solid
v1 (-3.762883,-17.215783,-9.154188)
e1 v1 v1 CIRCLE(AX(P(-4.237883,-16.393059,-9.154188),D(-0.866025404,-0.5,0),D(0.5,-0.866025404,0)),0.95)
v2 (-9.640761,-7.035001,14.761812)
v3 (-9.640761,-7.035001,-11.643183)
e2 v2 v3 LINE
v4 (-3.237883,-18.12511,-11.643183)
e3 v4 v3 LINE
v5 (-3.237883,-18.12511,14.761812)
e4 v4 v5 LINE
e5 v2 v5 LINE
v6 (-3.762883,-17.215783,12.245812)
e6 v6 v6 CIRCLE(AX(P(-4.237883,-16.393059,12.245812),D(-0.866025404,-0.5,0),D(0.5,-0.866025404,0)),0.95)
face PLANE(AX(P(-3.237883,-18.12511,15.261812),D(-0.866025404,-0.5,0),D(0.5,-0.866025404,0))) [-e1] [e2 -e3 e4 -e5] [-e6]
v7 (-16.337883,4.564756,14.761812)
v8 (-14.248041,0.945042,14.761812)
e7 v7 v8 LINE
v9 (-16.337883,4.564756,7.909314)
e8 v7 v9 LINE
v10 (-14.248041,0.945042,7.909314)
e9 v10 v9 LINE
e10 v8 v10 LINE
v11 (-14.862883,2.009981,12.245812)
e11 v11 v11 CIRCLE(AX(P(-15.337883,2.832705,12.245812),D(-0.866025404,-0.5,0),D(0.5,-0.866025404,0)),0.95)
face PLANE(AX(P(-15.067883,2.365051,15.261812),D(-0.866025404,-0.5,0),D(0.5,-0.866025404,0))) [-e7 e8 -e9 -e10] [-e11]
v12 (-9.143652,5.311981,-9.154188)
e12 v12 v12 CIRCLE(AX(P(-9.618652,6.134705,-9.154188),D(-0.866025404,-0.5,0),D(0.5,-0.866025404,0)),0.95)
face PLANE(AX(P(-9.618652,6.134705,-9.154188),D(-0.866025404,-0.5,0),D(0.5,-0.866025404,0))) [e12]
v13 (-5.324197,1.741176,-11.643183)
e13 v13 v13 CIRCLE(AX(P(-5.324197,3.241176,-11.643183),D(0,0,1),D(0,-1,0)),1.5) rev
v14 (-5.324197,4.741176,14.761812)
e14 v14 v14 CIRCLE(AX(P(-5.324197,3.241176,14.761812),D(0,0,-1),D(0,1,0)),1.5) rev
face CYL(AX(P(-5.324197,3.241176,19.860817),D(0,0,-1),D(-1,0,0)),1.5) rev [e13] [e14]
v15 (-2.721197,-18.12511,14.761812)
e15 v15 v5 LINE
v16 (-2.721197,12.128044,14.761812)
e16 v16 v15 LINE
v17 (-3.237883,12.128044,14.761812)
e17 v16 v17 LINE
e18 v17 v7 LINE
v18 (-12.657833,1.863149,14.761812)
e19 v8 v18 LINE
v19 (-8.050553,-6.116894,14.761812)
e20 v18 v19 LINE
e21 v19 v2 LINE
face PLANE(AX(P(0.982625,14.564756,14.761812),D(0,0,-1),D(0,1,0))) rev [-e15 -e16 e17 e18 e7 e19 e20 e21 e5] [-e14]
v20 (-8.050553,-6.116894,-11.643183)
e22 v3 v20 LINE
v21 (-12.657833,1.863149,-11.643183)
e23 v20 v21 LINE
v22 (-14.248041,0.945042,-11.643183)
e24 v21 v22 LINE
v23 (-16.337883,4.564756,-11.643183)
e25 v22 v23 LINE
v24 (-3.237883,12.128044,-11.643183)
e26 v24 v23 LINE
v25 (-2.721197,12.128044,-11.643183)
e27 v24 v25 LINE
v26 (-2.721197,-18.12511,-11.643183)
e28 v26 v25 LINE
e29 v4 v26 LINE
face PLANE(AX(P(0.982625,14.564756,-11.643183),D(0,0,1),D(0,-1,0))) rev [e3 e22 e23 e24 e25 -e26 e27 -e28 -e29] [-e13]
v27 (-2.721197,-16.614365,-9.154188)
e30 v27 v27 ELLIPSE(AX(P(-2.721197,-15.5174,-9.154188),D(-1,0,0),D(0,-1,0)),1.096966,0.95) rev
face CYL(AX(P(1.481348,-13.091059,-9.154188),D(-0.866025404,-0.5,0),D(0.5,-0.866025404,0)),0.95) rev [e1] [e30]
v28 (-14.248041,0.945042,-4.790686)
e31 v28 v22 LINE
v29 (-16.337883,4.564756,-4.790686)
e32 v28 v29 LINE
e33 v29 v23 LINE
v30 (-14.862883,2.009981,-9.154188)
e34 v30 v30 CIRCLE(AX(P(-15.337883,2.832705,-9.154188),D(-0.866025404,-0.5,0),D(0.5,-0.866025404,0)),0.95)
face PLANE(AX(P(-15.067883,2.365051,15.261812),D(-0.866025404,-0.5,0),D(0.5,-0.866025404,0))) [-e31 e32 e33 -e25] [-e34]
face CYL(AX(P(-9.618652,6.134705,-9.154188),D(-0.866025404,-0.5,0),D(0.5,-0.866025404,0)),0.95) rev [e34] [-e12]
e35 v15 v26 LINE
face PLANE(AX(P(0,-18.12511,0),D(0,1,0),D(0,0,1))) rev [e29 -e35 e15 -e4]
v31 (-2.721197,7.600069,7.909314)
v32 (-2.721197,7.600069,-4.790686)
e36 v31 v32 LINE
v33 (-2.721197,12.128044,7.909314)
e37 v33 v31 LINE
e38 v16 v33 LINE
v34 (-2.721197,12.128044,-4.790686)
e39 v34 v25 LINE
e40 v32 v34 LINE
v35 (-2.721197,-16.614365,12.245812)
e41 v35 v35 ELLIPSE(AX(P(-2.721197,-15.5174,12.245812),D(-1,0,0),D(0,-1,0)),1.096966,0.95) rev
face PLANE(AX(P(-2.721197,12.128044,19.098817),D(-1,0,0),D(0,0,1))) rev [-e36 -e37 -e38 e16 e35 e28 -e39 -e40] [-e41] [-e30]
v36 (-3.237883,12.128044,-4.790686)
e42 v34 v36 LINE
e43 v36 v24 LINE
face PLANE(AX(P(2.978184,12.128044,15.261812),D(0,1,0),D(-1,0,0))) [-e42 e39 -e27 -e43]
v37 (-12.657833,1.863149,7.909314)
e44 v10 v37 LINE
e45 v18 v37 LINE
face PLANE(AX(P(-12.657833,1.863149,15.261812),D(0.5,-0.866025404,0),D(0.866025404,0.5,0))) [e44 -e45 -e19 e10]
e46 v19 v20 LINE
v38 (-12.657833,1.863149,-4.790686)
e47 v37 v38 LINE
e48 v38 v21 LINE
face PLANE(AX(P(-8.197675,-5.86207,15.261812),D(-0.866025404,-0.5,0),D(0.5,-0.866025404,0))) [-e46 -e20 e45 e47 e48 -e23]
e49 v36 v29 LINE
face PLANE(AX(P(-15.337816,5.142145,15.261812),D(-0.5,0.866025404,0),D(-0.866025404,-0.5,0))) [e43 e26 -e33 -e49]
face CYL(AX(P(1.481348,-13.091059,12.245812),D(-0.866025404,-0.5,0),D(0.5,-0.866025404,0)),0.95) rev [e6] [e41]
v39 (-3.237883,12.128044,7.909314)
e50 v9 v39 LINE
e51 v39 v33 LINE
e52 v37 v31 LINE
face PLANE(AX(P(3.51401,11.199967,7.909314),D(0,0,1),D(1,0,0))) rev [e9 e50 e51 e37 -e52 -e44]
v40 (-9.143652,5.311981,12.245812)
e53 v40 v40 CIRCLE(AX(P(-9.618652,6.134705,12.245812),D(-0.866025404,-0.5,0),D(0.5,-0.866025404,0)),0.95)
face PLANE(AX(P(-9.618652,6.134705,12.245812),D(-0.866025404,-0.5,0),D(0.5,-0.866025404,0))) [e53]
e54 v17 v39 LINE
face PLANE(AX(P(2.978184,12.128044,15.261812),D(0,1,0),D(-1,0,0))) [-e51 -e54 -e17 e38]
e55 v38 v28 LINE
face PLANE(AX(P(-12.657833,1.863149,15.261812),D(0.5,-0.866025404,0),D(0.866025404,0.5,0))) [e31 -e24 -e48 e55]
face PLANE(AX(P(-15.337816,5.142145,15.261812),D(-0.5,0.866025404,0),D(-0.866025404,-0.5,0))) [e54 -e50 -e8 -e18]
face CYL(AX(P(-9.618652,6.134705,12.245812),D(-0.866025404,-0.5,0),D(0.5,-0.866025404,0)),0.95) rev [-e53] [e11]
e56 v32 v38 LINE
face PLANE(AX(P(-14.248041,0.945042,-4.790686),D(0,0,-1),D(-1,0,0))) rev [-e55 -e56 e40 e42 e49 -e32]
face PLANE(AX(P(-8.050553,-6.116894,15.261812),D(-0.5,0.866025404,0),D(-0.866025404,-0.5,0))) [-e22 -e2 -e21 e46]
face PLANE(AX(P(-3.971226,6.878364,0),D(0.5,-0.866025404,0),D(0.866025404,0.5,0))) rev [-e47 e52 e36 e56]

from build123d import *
from OCP.BRepAlgoAPI import BRepAlgoAPI_Cut
from OCP.TopTools import TopTools_ListOfShape

# Parameters (mm, degrees)
BOSS_EXTRUDE1_DEPTH      = 11.938
BOSS_EXTRUDE1_DEPTH_BACK = 18.12511
SKETCH1_W                = 6.216067572
SKETCH1_H                = 27.404994669
BOSS_EXTRUDE2_DEPTH      = 27.404995
CUT_EXTRUDE1_DEPTH       = 4.179688
SKETCH4_R                = 0.95
CUT_EXTRUDE2_DEPTH       = 6.604
SKETCH7_W                = 5.699381266
SKETCH7_H                = 30.253154106
CUT_EXTRUDE3_DEPTH       = 31.242
SKETCH8_R                = 1.5
CUT_EXTRUDE4_DEPTH       = 32.004
SKETCH9_W                = 0.5
SKETCH9_H                = 26.458343153
CUT_EXTRUDE5_DEPTH       = 20


with BuildPart() as part:
    # Sketch1 → Boss-Extrude1 (new, two sides: drawn at the far end of the back side and taken through both)
    with BuildSketch(Plane(origin=(0, 0, 0), x_dir=(1, 0, 0), z_dir=(0, 1, 0)).offset(-BOSS_EXTRUDE1_DEPTH_BACK)):
        with Locations((-0.12984965, -1.559314439)):
            Rectangle(SKETCH1_W, SKETCH1_H)
    extrude(amount=BOSS_EXTRUDE1_DEPTH + BOSS_EXTRUDE1_DEPTH_BACK)

    # Sketch2 → Boss-Extrude2 (add)
    with BuildSketch(Plane(origin=(0, 0, -12.143182896), x_dir=(-1, 0, 0), z_dir=(0, 0, -1))):
        Polygon((15.337816326, 5.142144986), (3.237883436, 12.128044498), (-2.978184136, 12.128044498), (-2.978184136, 11.938), (3.237883436, 11.938), (3.237883436, -18.125109608), (9.640760589, -7.035001064), (8.050552579, -6.116894042), (8.197675426, -5.862069796), (12.657832776, 1.863149344), (14.248040785, 0.945042321), (15.067883436, 2.365051446), (16.337883436, 4.564755971), align=None)
    extrude(amount=-BOSS_EXTRUDE2_DEPTH)

    # Sketch3 → Cut-Extrude1 (cut)
    with BuildSketch(Plane(origin=(-6.061068176, 10.498078028, 0), x_dir=(0.866025403784441, 0.49999999999999606, 0), z_dir=(-0.49999999999999606, 0.866025403784441, 0))):
        Polygon((-11.866644114, -1.559314438), (-11.866644114, -7.909314438), (3.259932939, -7.909314438), (8.643205368, -7.909314438), (8.643205368, 4.790685562), (3.259932939, 4.790685562), (-11.866644114, 4.790685562), align=None)
    extrude(amount=-CUT_EXTRUDE1_DEPTH, mode=Mode.SUBTRACT)

    # Sketch4 → Cut-Extrude2 (cut)
    with BuildSketch(Plane(origin=(-10.27681526, -5.933322057, 0), x_dir=(0, 0, 1), z_dir=(-0.8660254037844423, -0.49999999999999406, 0))):
        with Locations(Location((12.245811773, 10.122136351, 0), (0, 0, 270))):
            Circle(SKETCH4_R)
        with Locations(Location((-9.154188227, 10.122136351, 0), (0, 0, 270))):
            Circle(SKETCH4_R)
        with Locations(Location((-9.154188227, -12.077863649, 0), (0, 0, 270))):
            Circle(SKETCH4_R)
        with Locations(Location((12.245811773, -12.077863649, 0), (0, 0, 270))):
            Circle(SKETCH4_R)
    extrude(amount=-CUT_EXTRUDE2_DEPTH, mode=Mode.SUBTRACT)


with BuildPart() as cut_extrude3_tool:
    # Sketch7 → Cut-Extrude3 (new body)
    with BuildSketch(Plane(origin=(0, 0, -12.143182896), x_dir=(-1, 0, 0), z_dir=(0, 0, -1))):
        with Locations((-0.128493503, -2.998532555)):
            Rectangle(SKETCH7_W, SKETCH7_H)
    extrude(amount=-CUT_EXTRUDE3_DEPTH)


with BuildPart() as part_1:
    add(part.part)

    # Cut-Extrude3: cut by cut_extrude3_tool, with a tolerance
    cut_extrude3_stock = TopTools_ListOfShape()
    cut_extrude3_stock.Append(part_1.part.wrapped)
    cut_extrude3_tools = TopTools_ListOfShape()
    cut_extrude3_tools.Append(cut_extrude3_tool.part.wrapped)
    cut_extrude3_cut = BRepAlgoAPI_Cut()
    cut_extrude3_cut.SetArguments(cut_extrude3_stock)
    cut_extrude3_cut.SetTools(cut_extrude3_tools)
    cut_extrude3_cut.SetFuzzyValue(0.00001)
    cut_extrude3_cut.Build()
    add(Compound.cast(cut_extrude3_cut.Shape()).solids(), mode=Mode.REPLACE)

    # Sketch8 → Cut-Extrude4 (cut)
    with BuildSketch(Plane(origin=(0, 0, -12.143182896), x_dir=(-1, 0, 0), z_dir=(0, 0, -1))):
        with Locations((5.32419713, 3.241176343)):
            Circle(SKETCH8_R)
    extrude(amount=-CUT_EXTRUDE4_DEPTH, mode=Mode.SUBTRACT)

    # Sketch9 → Cut-Extrude5 (cut)
    with BuildSketch(Plane(origin=(-10.27681526, -5.933322057, 0), x_dir=(0, 0, 1), z_dir=(-0.8660254037844423, -0.49999999999999406, 0))):
        with Locations((-11.893182896, -1.107035226)):
            Rectangle(SKETCH9_W, SKETCH9_H)
        with Locations((15.011811773, -1.107035226)):
            Rectangle(SKETCH9_W, SKETCH9_H)
    extrude(amount=-CUT_EXTRUDE5_DEPTH, mode=Mode.SUBTRACT)


solid = part_1.part
